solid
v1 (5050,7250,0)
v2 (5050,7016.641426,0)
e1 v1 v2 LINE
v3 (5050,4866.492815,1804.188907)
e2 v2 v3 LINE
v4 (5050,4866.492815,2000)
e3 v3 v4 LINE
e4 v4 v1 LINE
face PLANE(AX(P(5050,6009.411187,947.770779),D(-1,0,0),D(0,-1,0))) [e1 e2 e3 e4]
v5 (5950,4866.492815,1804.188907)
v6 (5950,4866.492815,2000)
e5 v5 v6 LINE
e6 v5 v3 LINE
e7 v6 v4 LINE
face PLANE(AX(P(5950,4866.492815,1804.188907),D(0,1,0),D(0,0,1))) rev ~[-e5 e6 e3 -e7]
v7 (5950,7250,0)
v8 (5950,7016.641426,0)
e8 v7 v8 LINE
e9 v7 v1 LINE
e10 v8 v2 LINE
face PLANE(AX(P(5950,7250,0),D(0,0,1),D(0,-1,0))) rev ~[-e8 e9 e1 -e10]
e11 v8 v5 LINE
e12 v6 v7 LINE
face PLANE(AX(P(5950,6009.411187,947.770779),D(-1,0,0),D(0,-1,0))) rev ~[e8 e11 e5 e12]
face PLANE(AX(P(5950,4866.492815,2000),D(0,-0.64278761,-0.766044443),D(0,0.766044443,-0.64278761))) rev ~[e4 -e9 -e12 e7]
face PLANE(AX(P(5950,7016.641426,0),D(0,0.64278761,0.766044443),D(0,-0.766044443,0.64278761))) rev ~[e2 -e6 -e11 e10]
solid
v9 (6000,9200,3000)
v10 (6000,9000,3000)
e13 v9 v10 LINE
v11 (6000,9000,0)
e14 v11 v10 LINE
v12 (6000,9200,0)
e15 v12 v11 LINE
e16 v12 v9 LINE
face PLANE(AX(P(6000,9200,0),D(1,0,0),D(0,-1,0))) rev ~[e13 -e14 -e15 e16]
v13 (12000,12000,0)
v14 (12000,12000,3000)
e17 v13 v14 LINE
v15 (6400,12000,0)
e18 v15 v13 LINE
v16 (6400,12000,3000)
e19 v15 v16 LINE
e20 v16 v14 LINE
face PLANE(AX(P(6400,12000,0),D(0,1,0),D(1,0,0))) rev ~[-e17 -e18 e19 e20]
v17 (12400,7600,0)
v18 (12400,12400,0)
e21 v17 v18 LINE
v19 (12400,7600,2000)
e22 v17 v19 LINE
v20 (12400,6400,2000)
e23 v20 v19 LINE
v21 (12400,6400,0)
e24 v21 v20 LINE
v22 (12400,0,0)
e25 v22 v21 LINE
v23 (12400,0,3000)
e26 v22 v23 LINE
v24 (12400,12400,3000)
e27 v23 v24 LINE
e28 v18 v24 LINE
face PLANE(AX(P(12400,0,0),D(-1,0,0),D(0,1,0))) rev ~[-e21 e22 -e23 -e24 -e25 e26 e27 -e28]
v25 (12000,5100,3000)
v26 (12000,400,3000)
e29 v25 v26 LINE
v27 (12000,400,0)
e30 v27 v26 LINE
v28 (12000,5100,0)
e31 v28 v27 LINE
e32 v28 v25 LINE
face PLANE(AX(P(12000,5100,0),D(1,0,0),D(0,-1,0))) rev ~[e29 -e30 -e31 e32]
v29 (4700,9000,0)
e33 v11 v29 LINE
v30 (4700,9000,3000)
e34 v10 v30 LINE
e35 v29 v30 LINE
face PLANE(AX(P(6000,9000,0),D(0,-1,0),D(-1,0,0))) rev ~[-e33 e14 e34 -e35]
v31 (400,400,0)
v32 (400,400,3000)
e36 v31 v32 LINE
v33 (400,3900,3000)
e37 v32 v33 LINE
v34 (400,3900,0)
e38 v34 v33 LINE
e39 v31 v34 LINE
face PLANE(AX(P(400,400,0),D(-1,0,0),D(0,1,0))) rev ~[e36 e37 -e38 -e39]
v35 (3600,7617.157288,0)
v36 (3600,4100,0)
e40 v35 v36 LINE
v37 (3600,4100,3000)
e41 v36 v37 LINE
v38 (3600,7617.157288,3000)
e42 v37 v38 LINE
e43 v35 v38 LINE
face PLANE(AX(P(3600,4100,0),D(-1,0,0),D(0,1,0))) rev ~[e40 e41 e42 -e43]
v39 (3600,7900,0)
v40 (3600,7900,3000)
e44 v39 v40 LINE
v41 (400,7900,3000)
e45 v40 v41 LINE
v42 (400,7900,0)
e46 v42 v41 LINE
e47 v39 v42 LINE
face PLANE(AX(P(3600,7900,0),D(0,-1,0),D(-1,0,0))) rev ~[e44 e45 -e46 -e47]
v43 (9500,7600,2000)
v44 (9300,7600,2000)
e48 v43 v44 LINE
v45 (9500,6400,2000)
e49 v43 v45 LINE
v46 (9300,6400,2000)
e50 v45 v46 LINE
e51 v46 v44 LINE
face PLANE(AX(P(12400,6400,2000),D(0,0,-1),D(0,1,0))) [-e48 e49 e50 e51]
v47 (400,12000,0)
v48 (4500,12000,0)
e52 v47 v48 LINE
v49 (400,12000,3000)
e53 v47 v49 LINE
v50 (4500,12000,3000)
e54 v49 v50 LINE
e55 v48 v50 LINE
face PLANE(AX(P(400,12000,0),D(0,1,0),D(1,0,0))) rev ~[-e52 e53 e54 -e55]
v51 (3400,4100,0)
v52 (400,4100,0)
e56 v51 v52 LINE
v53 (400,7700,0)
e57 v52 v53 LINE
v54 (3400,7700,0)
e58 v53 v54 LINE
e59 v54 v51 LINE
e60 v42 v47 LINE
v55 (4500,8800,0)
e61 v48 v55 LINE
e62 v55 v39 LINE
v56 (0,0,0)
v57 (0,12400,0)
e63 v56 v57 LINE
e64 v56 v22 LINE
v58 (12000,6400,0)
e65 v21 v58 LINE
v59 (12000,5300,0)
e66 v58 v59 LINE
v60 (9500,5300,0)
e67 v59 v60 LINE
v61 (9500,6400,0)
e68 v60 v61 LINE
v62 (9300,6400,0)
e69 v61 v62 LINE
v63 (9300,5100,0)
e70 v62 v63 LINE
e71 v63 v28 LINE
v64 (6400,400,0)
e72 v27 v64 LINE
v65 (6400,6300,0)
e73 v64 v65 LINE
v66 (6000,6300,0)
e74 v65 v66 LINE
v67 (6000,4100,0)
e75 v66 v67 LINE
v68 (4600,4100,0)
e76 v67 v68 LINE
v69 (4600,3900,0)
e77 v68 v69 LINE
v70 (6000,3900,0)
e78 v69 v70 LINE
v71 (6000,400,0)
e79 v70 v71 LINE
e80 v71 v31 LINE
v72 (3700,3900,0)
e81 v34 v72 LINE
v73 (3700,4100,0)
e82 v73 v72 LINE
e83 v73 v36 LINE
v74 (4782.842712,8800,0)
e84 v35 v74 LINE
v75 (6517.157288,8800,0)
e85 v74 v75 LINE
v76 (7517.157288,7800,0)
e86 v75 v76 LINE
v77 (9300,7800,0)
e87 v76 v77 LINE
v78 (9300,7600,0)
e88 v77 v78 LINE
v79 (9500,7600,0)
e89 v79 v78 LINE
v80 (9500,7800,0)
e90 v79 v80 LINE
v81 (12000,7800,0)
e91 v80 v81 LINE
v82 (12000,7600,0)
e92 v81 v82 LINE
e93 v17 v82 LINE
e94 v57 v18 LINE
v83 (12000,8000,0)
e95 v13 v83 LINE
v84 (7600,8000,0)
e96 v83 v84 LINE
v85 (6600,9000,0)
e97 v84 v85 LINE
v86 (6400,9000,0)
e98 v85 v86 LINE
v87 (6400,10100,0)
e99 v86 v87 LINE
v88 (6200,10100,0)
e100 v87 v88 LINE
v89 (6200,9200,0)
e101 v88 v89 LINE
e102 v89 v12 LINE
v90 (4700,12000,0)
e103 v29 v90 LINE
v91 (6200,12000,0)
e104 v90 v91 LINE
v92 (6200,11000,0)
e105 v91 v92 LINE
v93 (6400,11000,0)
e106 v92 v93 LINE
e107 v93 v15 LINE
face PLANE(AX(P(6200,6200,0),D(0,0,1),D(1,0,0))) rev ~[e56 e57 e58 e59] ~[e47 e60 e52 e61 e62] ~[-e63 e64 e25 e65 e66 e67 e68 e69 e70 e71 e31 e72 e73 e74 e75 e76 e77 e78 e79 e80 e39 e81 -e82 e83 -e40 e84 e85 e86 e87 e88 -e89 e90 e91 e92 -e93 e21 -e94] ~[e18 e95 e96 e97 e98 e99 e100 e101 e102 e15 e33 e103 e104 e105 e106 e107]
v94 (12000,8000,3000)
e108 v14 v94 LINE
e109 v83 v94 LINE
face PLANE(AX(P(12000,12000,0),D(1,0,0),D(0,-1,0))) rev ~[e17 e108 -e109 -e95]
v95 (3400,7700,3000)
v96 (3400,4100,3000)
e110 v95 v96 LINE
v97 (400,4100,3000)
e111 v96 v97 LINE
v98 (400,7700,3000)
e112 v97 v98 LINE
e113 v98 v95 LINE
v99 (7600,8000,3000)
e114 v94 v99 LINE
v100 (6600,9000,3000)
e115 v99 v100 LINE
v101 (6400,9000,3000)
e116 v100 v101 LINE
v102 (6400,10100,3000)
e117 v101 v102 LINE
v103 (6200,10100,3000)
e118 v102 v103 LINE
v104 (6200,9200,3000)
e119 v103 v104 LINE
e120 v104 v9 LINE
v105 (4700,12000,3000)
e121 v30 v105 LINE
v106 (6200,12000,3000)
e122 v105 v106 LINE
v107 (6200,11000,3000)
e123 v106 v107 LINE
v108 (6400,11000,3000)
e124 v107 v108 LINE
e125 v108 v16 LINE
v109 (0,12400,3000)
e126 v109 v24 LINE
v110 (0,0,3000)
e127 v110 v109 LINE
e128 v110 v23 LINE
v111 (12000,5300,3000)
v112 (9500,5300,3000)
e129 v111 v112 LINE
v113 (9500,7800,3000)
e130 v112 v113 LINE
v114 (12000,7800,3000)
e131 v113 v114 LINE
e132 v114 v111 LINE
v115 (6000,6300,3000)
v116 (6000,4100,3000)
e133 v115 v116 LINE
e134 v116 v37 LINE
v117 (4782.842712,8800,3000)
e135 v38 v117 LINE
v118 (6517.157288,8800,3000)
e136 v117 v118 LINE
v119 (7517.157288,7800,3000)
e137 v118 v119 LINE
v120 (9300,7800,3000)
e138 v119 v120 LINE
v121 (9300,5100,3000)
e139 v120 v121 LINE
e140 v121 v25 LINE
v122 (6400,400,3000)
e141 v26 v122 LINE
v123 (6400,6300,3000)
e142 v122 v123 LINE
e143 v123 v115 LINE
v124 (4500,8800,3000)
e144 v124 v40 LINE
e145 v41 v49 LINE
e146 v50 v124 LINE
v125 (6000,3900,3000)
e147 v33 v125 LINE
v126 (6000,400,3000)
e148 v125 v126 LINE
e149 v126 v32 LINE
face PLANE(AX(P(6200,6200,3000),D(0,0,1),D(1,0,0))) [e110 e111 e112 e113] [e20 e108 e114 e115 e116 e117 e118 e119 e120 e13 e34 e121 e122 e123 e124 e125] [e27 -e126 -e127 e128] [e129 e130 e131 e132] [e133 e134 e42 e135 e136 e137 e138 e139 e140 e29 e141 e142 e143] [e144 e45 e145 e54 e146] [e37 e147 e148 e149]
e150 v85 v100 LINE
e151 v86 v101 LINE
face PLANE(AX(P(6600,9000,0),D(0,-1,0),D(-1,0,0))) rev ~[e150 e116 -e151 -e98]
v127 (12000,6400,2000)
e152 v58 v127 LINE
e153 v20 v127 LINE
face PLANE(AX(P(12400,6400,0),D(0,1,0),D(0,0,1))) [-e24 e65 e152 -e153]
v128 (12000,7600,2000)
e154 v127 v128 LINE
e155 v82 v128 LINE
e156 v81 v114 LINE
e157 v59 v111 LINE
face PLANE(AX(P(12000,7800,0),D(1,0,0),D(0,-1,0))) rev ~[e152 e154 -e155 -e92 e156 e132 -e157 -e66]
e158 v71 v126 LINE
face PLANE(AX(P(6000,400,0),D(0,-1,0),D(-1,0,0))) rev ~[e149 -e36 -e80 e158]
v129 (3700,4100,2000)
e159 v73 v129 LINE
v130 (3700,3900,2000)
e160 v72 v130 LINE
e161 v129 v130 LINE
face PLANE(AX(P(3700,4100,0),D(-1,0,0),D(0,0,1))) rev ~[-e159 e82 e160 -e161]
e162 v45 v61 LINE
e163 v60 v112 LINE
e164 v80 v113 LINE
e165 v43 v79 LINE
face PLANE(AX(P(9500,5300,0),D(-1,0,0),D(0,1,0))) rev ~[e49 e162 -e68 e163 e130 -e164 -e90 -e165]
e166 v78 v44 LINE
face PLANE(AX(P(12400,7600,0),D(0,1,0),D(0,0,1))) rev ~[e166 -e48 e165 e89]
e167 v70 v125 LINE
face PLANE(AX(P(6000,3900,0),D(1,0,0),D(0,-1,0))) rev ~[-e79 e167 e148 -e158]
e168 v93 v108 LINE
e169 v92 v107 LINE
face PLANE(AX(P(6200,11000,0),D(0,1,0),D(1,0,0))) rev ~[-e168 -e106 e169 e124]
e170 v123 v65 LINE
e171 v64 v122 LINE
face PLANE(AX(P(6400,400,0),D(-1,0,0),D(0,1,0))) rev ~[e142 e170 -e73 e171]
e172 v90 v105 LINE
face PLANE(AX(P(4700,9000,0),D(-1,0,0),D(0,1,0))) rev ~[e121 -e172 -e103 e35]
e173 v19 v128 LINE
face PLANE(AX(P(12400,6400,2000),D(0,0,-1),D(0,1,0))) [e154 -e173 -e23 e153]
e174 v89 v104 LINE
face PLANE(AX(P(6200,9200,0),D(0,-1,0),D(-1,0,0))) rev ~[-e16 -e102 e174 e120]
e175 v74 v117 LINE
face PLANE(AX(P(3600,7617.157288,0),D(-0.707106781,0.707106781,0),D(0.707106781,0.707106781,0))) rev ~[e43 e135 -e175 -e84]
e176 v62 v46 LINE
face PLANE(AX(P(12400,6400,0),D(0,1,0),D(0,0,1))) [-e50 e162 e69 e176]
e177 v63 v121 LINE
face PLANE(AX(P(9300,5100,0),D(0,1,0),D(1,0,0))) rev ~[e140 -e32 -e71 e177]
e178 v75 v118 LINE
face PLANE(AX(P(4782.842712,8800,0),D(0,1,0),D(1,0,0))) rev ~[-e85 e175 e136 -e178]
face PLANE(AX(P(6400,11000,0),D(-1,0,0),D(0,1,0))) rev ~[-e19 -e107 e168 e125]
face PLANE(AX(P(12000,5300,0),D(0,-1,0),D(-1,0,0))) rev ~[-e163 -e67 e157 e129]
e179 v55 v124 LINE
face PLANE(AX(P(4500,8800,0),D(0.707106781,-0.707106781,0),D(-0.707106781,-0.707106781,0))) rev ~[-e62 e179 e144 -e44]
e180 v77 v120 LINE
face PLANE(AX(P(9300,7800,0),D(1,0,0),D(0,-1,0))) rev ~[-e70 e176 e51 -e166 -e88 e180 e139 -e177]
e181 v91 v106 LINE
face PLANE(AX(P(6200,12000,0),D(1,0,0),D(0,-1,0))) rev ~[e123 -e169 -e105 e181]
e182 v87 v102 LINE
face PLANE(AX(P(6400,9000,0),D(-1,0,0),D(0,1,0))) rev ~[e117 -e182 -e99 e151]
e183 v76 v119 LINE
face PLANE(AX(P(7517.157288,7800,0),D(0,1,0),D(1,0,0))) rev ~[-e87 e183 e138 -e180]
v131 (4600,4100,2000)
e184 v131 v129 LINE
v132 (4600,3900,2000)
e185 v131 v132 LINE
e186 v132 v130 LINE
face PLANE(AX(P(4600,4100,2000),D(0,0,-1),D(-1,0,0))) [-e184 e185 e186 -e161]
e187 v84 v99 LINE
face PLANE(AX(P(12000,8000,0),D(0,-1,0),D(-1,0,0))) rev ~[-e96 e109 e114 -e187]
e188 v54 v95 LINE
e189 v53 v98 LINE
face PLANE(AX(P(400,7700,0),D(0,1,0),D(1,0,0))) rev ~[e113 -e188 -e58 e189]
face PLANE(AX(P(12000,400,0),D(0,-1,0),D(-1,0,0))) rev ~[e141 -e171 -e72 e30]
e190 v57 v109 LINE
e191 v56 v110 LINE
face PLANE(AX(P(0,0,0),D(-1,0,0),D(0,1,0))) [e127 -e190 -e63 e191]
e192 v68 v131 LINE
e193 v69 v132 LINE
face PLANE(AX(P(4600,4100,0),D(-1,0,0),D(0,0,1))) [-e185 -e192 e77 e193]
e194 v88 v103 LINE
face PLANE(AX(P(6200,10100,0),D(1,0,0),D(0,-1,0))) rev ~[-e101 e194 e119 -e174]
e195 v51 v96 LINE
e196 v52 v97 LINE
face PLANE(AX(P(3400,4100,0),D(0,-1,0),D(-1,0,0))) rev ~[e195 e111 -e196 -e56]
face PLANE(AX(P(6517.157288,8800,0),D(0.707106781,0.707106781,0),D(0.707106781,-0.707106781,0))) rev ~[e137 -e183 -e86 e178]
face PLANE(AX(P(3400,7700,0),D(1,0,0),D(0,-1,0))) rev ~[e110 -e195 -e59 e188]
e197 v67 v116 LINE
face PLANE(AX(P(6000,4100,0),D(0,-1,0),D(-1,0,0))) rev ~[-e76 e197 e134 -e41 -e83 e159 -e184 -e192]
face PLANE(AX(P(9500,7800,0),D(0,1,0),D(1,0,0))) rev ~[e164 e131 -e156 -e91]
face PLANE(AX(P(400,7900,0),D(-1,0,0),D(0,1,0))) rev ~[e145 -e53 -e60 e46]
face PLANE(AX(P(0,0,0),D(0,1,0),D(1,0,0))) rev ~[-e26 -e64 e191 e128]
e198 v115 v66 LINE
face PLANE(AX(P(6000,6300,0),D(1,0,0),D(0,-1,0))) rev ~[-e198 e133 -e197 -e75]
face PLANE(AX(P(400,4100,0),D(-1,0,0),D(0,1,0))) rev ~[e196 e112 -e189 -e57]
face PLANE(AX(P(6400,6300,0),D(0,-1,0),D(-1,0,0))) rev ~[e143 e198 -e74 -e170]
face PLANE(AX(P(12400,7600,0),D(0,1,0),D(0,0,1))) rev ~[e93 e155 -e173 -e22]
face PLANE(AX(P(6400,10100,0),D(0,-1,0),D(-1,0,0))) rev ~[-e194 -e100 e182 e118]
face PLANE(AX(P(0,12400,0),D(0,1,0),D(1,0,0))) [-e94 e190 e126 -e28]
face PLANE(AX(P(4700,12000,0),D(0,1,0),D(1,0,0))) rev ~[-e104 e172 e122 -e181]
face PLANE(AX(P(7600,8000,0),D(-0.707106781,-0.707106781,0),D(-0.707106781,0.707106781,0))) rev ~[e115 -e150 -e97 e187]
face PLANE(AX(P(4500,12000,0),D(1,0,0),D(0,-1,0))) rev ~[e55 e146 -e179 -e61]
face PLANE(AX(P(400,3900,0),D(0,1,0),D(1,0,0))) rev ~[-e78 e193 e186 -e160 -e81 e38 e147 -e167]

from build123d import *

# Parameters (mm, degrees)
F0_W      = 12400
F0_H      = 12400
F1_DEPTH  = 3000
F2_W      = 1200
F2_H      = 2000
F3_DEPTH  = 6000
F4_W      = 1300
F4_H      = 2000
F5_DEPTH  = 2800
F6_W      = 900
F6_H      = 2000
F7_DEPTH  = 200
F10_DEPTH = 900


# Not quite as in the source:
# - a feature names something its author has since deleted; it is built from what else it names


with BuildPart() as f1:
    # F0 (on Top) → F1 (new body)
    with BuildSketch(Plane.XY):
        with Locations((6200, 6200)):
            Rectangle(F0_W, F0_H)
        Polygon((6000, 400), (400, 400), (400, 3900), (400, 4100), (400, 7700), (400, 7900), (400, 12000), (4500, 12000), (4700, 12000), (6000, 12000), (6200, 12000), (6200, 11000), (6400, 11000), (6400, 12000), (12000, 12000), (12000, 8000), (12000, 7800), (12000, 5300), (12000, 5100), (12000, 400), (6400, 400), (6400, 6300), (6000, 6300), (6000, 4100), (6000, 3900), align=None, mode=Mode.SUBTRACT)
        Polygon((400, 7900), (400, 7700), (3400, 7700), (3400, 4100), (3600, 4100), (3600, 7617.1572875254), (4782.8427124746, 8800), (6517.1572875254, 8800), (7517.1572875254, 7800), (9300, 7800), (9300, 5100), (12000, 5100), (12000, 5300), (9500, 5300), (9500, 7800), (12000, 7800), (12000, 8000), (7600, 8000), (6600, 9000), (6400, 9000), (6400, 10100), (6200, 10100), (6200, 9200), (6000, 9200), (6000, 9000), (4700, 9000), (4700, 12000), (4500, 12000), (4500, 8800), (3600, 7900), align=None)
        Polygon((400, 4100), (400, 3900), (6000, 3900), (6000, 4100), (3600, 4100), (3400, 4100), align=None)
    extrude(amount=F1_DEPTH)

    # F2 (on face) → F3 (cut, through all)
    with BuildSketch(Plane.YZ.offset(12400)):
        with Locations((7000, 1000)):
            Rectangle(F2_W, F2_H)
    extrude(amount=-F3_DEPTH, mode=Mode.SUBTRACT)

    # F4 (on face) → F5 (cut, through all)
    with BuildSketch(Plane.YZ.offset(6400)):
        with Locations((6950, 1000)):
            Rectangle(F4_W, F4_H)
    extrude(amount=-F5_DEPTH, mode=Mode.SUBTRACT)

    # F6 (on face) → F7 (cut, through all)
    with BuildSketch(Plane(origin=(0, 4100, 0), x_dir=(-1, 0, 0), z_dir=(0, 1, 0))):
        with Locations((-4150, 1000)):
            Rectangle(F6_W, F6_H)
    extrude(amount=-F7_DEPTH, mode=Mode.SUBTRACT)


with BuildPart() as f10:
    # F9 (on plane+point) → F10 (new body)
    with BuildSketch(Plane(origin=(5950, 0, 0), x_dir=(0, -1, 0), z_dir=(-1, 0, 0))):
        Polygon((-4866.4928148116, 2000), (-7250, 0), (-7016.6414259709, 0), (-4866.4928148116, 1804.1889066002), align=None)
    extrude(amount=F10_DEPTH)


solid = Compound([f1.part, f10.part])
